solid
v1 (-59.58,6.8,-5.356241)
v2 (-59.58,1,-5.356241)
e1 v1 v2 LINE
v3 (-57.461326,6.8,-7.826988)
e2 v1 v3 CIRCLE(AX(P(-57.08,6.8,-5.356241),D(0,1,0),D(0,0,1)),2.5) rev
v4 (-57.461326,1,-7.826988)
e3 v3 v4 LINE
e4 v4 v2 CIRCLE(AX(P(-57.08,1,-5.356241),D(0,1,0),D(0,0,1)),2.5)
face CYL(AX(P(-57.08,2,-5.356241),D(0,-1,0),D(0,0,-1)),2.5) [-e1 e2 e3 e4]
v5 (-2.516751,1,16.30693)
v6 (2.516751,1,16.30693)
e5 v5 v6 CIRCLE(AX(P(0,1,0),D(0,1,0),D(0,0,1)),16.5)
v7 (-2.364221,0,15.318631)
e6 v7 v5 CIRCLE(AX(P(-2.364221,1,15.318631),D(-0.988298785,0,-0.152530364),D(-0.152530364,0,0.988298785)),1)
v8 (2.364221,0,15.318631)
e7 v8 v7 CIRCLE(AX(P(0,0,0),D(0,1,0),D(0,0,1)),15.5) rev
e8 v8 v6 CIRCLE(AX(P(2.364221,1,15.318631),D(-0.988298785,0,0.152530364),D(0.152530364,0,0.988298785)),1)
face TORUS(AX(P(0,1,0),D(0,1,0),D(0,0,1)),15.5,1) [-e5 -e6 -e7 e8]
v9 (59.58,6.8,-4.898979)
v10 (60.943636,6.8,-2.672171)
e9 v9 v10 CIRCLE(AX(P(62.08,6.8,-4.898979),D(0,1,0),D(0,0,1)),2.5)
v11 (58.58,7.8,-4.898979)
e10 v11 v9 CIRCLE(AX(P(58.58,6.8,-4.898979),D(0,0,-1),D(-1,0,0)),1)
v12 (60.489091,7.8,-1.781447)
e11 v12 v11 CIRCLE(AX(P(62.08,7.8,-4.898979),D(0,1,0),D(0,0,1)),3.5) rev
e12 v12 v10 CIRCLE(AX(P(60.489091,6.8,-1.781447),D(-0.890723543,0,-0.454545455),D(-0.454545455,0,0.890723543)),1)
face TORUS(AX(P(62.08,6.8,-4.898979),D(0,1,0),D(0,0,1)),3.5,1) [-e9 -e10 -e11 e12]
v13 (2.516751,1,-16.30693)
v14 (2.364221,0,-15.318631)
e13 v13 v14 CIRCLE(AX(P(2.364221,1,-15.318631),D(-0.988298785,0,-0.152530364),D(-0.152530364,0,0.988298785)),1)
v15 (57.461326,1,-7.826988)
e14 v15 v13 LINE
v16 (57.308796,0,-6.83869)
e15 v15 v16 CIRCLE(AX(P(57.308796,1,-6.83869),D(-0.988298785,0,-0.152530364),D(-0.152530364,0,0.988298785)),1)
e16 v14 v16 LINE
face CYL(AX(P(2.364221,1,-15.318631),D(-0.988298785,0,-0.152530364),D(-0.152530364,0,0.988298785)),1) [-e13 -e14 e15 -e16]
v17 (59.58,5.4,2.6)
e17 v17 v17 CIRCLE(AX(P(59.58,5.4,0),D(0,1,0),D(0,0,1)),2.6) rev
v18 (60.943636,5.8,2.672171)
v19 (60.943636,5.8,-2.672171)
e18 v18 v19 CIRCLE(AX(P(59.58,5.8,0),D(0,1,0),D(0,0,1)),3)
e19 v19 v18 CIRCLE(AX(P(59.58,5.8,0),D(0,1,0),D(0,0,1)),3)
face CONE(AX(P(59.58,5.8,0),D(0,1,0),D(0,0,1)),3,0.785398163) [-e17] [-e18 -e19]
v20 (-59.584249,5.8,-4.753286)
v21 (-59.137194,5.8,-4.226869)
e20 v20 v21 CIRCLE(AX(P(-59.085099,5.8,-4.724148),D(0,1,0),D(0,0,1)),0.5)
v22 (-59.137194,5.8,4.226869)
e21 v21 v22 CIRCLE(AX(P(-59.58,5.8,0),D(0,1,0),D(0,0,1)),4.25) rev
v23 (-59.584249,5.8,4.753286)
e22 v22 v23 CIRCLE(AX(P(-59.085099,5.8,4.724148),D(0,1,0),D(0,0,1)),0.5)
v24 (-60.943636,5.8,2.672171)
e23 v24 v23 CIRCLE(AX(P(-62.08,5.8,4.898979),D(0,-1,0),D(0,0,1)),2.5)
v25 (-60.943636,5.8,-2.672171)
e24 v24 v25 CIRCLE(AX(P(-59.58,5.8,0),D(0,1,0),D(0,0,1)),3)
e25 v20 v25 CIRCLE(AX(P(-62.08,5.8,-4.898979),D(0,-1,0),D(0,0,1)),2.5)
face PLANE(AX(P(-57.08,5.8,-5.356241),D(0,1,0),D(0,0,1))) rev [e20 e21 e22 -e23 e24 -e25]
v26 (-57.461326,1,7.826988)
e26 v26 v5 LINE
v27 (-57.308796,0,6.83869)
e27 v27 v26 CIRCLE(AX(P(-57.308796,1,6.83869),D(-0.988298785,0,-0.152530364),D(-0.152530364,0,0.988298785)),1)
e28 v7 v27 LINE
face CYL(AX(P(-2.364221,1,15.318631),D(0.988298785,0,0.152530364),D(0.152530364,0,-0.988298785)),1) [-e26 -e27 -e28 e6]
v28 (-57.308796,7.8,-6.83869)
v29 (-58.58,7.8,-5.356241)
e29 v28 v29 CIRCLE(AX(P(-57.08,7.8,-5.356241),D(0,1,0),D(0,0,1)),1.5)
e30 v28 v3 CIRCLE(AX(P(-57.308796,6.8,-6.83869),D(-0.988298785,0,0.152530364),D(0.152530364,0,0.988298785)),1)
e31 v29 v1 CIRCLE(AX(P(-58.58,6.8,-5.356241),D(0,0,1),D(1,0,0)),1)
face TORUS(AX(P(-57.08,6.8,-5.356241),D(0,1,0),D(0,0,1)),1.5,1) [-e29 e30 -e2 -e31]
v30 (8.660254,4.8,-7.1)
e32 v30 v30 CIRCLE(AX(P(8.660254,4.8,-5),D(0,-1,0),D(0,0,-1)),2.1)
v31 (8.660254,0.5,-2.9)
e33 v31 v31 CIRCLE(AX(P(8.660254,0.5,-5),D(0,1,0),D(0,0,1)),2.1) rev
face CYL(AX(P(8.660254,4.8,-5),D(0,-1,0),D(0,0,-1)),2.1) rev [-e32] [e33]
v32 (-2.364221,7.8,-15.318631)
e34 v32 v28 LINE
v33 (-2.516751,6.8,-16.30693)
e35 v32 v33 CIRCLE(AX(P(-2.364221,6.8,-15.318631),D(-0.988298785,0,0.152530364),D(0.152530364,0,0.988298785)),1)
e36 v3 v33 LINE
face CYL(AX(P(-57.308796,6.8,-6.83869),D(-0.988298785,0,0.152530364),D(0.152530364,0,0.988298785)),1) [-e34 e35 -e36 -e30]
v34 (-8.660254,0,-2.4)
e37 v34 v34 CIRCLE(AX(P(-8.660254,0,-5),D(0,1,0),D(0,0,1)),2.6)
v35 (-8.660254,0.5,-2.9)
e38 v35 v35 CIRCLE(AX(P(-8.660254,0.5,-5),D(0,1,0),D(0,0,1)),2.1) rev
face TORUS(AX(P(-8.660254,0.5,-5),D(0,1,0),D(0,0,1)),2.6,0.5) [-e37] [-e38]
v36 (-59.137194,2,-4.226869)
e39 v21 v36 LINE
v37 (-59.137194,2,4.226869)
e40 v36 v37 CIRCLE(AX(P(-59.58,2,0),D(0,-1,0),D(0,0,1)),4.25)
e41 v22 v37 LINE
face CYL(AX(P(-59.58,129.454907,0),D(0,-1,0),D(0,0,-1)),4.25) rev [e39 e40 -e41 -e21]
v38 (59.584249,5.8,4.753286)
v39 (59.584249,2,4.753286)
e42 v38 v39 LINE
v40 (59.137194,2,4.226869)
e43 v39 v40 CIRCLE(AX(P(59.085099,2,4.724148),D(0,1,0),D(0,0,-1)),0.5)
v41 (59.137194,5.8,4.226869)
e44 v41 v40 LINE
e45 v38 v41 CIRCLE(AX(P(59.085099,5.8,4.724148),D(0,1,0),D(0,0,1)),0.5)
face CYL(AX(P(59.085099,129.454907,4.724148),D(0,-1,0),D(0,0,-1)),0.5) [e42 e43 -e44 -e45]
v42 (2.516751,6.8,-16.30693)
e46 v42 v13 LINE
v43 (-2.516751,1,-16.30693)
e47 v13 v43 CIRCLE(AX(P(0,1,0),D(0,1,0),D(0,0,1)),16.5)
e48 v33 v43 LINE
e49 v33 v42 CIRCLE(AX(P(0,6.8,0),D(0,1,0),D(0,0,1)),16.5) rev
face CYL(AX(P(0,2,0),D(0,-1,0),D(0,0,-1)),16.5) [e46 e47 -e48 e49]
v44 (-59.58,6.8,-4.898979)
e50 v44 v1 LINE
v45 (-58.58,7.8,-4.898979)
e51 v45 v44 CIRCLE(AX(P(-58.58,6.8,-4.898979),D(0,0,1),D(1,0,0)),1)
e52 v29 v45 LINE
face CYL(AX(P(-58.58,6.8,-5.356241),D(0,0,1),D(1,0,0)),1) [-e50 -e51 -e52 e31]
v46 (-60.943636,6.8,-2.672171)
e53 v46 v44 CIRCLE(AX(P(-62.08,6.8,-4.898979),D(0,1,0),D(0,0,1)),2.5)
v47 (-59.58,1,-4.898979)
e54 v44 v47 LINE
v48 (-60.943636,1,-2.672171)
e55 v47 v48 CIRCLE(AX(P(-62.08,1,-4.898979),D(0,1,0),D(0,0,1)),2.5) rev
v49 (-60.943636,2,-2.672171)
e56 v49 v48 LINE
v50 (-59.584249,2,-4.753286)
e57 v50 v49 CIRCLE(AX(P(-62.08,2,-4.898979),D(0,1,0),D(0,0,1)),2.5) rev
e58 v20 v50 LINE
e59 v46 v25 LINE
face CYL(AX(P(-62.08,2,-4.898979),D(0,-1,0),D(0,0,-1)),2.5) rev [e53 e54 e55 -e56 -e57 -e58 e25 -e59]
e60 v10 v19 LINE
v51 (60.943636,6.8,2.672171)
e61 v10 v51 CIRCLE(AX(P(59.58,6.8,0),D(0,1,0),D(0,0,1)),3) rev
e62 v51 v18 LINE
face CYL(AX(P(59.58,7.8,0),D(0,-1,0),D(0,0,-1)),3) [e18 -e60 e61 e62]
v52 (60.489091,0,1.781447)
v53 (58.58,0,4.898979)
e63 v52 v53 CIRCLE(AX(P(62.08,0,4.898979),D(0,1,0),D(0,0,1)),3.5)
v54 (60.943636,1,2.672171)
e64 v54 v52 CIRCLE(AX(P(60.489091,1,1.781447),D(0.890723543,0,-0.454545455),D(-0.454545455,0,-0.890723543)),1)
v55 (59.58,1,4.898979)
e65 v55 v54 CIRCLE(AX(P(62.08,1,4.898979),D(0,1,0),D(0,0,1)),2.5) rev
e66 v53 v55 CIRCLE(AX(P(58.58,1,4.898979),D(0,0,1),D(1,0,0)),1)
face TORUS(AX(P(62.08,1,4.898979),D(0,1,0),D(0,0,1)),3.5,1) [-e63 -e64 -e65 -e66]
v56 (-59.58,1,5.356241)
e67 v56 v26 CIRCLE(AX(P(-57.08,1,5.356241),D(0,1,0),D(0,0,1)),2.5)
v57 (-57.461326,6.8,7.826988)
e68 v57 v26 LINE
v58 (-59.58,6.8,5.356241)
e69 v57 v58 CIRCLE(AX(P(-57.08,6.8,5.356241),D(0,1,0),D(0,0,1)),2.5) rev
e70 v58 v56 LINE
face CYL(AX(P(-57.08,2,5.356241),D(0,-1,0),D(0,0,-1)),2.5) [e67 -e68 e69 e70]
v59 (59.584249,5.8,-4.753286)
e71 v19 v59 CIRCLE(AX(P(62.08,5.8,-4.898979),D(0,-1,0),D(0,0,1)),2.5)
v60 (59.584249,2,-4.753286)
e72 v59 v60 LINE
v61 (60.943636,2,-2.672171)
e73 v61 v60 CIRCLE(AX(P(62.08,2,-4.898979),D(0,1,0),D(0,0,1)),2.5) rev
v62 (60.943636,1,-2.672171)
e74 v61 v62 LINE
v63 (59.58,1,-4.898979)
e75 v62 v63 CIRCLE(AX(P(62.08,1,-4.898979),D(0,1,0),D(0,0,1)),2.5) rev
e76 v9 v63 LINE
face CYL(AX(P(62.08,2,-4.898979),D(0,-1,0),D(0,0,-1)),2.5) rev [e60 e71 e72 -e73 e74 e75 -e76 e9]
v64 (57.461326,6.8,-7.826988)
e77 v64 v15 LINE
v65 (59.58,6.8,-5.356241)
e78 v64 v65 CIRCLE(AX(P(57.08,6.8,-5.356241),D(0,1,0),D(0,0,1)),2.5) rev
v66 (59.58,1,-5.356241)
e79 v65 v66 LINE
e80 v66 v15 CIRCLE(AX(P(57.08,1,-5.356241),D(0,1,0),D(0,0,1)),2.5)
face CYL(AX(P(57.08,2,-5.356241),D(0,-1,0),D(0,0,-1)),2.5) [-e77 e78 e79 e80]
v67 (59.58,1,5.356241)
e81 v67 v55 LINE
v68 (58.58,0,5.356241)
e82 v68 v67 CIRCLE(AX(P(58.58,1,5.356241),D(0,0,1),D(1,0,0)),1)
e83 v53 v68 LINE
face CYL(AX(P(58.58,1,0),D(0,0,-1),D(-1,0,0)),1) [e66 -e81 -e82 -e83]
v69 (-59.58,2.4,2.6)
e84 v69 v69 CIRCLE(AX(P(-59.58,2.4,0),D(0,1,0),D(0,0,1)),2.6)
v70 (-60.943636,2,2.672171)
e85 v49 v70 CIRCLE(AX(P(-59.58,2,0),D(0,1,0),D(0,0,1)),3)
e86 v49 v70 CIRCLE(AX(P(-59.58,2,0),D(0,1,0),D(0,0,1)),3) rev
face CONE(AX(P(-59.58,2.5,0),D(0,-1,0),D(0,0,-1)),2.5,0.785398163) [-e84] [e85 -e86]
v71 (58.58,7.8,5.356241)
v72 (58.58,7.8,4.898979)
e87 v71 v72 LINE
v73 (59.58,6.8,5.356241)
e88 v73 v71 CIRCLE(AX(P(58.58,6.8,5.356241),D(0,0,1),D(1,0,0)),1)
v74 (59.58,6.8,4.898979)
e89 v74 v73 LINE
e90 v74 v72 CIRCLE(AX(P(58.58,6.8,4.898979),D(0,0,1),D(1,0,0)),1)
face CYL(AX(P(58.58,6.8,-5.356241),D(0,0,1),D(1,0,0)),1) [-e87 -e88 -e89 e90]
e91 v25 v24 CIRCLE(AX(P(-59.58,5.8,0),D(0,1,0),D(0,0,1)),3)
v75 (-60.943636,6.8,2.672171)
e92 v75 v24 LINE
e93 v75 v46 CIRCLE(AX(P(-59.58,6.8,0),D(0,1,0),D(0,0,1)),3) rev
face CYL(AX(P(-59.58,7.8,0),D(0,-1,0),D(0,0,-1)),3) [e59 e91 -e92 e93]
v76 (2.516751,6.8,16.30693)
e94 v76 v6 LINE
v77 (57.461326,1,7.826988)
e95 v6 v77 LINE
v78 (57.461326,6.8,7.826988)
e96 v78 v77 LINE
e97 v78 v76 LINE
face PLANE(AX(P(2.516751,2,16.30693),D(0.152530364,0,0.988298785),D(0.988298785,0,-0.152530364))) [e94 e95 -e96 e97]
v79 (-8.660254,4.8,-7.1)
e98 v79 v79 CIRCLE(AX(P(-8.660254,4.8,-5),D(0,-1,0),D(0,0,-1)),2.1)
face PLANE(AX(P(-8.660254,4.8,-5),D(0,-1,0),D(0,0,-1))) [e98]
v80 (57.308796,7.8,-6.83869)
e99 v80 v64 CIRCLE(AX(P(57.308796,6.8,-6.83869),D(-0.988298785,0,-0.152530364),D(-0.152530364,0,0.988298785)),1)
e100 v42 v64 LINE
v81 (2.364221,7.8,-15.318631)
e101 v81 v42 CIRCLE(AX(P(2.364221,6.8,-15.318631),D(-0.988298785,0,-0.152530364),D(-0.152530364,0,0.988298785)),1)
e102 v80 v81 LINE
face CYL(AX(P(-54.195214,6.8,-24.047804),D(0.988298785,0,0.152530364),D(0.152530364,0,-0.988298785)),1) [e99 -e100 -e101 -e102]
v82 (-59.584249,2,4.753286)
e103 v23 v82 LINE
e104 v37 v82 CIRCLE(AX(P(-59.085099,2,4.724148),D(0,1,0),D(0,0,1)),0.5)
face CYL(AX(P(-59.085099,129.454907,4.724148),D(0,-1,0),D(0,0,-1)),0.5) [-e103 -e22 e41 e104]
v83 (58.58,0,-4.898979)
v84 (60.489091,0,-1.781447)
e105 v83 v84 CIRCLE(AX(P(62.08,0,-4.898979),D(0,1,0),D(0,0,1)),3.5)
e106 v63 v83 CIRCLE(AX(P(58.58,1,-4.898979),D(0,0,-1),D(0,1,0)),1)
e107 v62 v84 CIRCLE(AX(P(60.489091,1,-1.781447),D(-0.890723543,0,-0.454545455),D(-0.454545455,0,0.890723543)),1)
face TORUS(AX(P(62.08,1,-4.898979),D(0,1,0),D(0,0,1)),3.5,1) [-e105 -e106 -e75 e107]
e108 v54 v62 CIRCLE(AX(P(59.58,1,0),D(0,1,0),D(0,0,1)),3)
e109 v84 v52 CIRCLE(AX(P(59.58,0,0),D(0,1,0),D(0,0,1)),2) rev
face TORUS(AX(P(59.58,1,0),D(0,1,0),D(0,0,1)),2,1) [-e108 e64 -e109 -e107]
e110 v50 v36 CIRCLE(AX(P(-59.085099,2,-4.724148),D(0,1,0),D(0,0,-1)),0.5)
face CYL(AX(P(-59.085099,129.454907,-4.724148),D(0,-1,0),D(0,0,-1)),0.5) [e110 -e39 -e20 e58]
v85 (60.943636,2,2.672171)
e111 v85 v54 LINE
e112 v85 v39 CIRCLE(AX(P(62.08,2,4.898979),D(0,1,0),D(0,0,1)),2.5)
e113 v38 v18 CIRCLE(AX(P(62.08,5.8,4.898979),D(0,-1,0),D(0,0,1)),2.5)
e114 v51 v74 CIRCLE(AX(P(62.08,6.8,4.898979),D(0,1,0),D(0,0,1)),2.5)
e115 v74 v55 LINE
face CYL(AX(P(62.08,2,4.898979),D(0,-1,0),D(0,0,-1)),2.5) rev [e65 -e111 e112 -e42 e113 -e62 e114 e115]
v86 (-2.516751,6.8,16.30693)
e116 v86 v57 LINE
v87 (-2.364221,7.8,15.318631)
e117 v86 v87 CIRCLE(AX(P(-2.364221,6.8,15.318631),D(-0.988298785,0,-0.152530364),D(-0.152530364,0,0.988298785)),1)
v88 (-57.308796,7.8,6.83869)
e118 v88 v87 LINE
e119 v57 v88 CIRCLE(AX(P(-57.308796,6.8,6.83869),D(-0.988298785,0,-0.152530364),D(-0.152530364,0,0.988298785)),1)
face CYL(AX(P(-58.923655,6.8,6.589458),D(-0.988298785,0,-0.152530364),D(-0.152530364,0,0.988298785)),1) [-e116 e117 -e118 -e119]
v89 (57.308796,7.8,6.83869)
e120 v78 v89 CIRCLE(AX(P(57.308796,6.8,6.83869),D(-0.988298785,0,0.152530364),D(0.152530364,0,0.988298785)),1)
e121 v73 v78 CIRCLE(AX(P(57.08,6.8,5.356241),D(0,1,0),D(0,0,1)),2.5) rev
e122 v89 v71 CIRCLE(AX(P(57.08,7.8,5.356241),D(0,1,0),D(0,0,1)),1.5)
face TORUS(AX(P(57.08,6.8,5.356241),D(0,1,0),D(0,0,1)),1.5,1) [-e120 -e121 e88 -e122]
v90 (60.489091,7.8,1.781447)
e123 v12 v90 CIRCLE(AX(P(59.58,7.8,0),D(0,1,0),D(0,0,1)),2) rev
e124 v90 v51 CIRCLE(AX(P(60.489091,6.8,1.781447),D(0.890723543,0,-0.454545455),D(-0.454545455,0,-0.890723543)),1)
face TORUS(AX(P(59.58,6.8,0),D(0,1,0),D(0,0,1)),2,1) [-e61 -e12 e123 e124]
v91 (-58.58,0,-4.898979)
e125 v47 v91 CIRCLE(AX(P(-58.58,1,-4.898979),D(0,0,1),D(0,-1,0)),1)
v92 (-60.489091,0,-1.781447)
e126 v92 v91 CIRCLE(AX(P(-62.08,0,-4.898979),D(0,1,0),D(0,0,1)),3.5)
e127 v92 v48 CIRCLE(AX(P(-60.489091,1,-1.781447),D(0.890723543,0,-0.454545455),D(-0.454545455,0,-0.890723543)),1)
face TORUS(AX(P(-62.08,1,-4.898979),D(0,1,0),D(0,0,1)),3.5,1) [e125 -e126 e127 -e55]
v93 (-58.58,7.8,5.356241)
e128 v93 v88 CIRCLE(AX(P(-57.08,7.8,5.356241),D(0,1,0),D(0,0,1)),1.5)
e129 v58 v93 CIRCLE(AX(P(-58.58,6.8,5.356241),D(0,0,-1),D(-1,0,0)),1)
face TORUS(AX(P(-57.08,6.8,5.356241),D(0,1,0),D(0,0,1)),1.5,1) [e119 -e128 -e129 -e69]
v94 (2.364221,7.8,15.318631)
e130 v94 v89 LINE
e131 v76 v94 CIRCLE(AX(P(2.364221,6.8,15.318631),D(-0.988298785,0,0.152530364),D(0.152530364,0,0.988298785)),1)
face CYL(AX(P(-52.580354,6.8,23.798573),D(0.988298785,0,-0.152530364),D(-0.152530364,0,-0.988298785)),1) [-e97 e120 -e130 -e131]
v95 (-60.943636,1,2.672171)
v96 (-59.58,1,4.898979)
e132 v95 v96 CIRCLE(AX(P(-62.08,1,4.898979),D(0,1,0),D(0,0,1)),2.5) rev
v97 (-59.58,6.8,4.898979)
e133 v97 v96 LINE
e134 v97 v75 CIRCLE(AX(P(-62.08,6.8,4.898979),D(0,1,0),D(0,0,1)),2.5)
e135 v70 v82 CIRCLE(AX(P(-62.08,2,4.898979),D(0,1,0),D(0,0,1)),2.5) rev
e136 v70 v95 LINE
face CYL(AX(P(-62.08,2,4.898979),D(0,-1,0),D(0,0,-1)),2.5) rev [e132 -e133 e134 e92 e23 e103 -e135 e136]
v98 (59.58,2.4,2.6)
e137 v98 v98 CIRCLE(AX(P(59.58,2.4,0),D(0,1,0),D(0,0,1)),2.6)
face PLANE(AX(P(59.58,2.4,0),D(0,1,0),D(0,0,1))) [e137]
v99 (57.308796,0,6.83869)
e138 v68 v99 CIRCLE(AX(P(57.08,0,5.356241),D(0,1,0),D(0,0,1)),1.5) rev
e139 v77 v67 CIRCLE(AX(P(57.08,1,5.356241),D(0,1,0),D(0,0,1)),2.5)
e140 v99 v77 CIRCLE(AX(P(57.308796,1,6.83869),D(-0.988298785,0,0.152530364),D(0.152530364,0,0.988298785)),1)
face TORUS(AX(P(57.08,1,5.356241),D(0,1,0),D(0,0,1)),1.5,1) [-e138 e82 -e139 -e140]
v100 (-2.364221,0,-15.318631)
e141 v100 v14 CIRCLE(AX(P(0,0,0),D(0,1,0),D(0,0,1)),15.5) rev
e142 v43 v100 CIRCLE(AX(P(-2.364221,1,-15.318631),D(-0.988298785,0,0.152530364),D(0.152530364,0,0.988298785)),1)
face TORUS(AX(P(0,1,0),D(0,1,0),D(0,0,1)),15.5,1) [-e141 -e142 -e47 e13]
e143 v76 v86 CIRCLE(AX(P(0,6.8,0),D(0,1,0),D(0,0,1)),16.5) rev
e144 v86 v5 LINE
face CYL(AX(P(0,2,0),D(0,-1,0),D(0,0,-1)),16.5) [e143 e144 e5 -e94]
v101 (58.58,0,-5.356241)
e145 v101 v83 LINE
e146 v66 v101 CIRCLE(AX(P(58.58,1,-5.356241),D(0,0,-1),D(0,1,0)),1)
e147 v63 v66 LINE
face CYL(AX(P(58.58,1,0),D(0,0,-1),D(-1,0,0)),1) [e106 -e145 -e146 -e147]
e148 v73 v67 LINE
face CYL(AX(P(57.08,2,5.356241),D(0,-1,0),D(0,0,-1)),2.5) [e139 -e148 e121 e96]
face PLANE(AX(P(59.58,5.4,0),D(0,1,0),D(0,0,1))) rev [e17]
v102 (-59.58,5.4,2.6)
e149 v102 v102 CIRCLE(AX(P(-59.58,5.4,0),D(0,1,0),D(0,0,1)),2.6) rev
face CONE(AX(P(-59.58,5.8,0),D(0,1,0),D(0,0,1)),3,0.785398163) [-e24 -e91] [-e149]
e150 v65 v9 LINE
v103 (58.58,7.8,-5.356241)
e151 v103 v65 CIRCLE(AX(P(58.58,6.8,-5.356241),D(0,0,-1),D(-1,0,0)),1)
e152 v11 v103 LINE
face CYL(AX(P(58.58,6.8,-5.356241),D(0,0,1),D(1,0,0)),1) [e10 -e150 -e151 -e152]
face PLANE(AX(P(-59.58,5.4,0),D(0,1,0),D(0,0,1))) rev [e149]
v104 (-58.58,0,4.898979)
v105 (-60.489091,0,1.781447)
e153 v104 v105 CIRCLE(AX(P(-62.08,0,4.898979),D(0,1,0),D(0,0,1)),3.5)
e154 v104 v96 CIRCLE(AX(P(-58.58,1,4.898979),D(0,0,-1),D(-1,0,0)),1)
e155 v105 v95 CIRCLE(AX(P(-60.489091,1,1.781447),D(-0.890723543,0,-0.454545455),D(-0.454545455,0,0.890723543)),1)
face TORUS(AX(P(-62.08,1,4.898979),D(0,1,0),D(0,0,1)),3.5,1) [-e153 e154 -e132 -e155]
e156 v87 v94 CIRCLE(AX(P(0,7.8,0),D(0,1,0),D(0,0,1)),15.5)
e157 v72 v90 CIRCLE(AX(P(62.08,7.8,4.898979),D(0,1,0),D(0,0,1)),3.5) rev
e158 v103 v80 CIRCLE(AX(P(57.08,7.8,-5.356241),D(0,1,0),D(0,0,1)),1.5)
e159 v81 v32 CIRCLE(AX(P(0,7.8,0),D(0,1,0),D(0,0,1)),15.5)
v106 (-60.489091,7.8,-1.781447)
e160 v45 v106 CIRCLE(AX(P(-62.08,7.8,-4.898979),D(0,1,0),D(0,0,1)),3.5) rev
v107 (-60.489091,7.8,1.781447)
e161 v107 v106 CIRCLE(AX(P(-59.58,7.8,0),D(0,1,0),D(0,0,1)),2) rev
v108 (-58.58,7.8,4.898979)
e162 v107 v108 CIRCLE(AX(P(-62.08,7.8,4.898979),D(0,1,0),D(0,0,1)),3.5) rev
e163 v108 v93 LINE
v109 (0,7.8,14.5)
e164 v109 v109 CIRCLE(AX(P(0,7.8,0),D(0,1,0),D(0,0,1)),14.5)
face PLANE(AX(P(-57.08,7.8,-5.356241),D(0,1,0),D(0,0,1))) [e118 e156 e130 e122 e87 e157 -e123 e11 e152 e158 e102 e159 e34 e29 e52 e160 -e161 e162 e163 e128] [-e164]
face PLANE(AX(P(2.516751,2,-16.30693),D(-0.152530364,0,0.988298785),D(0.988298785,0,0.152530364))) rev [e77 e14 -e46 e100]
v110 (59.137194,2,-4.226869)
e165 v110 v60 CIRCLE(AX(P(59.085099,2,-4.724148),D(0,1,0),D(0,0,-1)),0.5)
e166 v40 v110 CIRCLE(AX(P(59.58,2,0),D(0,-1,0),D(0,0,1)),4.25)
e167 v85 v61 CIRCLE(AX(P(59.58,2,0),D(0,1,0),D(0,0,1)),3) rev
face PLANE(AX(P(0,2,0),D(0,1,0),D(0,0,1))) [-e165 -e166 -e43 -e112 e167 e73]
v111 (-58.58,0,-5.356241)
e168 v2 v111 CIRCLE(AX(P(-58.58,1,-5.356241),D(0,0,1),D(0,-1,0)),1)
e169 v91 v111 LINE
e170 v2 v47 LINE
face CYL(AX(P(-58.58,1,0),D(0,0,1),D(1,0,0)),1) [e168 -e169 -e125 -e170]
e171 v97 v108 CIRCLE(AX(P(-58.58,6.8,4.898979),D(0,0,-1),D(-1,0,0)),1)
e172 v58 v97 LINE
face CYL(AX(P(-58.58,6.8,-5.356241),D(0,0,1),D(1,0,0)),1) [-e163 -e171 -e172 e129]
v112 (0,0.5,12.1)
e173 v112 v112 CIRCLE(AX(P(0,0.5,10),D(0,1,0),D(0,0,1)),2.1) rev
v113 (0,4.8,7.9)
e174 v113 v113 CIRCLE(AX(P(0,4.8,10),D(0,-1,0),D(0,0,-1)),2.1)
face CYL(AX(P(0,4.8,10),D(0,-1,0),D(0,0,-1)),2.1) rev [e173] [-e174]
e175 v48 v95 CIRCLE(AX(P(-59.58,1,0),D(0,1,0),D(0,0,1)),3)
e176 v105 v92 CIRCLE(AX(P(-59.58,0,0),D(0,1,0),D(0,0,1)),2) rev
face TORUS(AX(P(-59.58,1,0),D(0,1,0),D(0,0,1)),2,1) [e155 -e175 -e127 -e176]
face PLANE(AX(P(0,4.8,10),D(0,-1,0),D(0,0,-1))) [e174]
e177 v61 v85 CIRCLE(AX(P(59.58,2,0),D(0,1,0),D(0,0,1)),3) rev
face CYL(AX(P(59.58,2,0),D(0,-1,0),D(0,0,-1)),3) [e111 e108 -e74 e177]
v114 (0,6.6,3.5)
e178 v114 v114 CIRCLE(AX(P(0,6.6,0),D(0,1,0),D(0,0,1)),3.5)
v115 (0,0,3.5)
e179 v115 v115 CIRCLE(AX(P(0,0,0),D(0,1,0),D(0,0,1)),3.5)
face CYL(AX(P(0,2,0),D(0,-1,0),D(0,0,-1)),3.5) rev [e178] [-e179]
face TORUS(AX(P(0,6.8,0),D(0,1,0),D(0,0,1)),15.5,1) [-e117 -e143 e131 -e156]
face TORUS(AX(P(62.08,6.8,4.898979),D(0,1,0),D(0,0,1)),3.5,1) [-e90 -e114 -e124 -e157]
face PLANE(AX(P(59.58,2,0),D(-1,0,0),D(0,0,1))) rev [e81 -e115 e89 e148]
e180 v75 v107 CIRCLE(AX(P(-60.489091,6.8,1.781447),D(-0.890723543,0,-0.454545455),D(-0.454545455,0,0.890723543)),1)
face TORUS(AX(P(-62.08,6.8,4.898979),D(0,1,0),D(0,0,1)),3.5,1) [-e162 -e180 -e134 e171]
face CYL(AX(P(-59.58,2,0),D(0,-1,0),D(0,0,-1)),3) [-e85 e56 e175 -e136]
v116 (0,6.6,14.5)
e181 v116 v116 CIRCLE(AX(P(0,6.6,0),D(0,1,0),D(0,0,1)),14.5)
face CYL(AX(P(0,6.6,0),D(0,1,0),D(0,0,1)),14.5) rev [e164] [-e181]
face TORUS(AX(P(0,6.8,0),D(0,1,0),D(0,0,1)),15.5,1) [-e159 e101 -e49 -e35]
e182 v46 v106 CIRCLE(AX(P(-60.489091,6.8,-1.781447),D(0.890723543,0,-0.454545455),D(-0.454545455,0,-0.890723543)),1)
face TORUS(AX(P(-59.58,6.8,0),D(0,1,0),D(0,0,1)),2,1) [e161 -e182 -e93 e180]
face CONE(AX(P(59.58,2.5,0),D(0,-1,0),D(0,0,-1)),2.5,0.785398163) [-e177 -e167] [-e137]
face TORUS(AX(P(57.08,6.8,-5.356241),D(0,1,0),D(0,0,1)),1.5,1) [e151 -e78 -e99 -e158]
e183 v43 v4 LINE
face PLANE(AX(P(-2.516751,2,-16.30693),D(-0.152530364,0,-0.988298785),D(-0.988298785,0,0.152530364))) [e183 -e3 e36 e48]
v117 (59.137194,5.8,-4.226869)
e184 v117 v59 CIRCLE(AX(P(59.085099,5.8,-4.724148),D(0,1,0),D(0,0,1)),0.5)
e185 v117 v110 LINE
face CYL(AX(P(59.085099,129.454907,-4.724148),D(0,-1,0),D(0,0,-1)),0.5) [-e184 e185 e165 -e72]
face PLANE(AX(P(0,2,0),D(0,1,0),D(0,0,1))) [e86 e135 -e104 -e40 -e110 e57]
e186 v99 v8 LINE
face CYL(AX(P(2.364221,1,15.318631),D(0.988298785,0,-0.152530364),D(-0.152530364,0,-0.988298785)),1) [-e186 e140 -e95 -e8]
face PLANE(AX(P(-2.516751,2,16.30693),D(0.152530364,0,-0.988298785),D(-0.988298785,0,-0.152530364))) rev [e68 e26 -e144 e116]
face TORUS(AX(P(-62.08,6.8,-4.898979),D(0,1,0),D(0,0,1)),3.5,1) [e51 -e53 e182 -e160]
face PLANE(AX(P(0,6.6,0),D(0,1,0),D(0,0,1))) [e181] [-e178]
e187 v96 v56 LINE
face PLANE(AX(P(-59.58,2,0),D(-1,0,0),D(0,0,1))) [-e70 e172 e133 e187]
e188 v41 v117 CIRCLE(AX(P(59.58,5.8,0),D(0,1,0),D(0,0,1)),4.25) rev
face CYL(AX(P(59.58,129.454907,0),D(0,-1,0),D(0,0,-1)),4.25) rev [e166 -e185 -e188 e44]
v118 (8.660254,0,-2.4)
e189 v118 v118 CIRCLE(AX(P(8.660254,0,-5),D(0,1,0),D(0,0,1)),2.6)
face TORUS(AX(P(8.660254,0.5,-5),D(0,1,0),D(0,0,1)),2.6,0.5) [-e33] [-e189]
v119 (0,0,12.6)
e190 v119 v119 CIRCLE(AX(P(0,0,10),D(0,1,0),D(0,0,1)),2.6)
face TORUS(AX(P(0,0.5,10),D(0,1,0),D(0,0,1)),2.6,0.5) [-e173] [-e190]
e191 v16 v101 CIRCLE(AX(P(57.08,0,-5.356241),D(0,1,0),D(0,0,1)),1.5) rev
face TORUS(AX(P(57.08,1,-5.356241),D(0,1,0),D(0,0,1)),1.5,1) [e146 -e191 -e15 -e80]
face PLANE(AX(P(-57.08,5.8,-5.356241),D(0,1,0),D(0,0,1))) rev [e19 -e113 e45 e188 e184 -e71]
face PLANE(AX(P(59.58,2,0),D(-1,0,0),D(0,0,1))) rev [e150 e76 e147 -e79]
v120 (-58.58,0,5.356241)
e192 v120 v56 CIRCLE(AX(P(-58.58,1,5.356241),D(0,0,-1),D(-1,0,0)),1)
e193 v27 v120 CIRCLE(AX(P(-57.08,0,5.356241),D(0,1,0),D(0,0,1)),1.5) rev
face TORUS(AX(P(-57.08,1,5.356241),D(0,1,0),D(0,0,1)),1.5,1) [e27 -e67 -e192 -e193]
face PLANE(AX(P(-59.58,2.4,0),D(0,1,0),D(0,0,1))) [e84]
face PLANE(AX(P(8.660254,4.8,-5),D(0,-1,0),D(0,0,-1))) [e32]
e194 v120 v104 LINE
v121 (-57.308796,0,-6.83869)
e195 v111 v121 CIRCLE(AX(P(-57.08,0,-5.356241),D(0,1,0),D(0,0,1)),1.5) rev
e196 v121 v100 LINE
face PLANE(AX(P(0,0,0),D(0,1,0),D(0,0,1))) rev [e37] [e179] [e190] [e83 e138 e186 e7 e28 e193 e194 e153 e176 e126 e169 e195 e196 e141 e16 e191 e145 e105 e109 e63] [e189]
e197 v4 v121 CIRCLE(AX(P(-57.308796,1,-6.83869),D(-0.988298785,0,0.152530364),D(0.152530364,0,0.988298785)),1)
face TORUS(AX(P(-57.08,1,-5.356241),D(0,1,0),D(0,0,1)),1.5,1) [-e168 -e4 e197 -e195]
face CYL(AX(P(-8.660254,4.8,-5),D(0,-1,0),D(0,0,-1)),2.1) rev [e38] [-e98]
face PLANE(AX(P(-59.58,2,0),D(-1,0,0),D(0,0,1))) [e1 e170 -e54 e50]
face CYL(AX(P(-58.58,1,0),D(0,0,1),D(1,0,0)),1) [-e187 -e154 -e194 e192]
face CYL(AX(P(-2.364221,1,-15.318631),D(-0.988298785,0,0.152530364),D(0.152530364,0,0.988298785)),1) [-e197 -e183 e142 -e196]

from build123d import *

# Parameters (mm, degrees)
SKETCH1_R             = 3.5
BOSS_EXTRUDE1_DEPTH   = 2
SKETCH2_R             = 2.5
BOSS_EXTRUDE2_DEPTH   = 0.4
SKETCH3_R             = 2
BOSS_EXTRUDE3_DEPTH   = 3
SKETCH5_R             = 2.5
BOSS_EXTRUDE4_DEPTH   = 0.4
SKETCH4_R             = 3.5
BOSS_EXTRUDE5_DEPTH   = 3.8
SKETCH6_R             = 3.5
BOSS_EXTRUDE6_DEPTH   = 2
SKETCH9_R             = 14.5
CUT_EXTRUDE3_DEPTH    = 1.2
CUT_EXTRUDE5_START    = -1
SKETCH12_R            = 2
CUT_EXTRUDE5_DEPTH    = 65.187010976
CHAMFER1_SIZE         = 0.5
SKETCH13_R            = 2.1
CUT_EXTRUDE6_DEPTH    = 4.8
FILLET4_R             = 0.5
FILLET5_R             = 1
DELETEFACE1_START     = 1
DELETEFACE1_OUTLINE_R = 2
DELETEFACE1_DEPTH     = 1.4
DELETEFACE2_START     = 5.4
DELETEFACE2_OUTLINE_R = 2
DELETEFACE2_DEPTH     = 2.4


with BuildPart() as part:
    # Sketch1 → Boss-Extrude1 (new body)
    with BuildSketch(Plane(origin=(0, 0, 0), x_dir=(1, 0, 0), z_dir=(0, 1, 0))):
        with BuildLine():
            ThreePointArc((-59.58, 5.356241329), (-58.977803306, 6.983614247), (-57.461325911, 7.826988291))
            Line((-57.461325911, 7.826988291), (-2.516751014, 16.306929948))
            ThreePointArc((-2.516751014, 16.306929948), (0, 16.5), (2.516751014, 16.306929948))
            Line((2.516751014, 16.306929948), (57.461325911, 7.826988291))
            ThreePointArc((57.461325911, 7.826988291), (58.977803306, 6.983614247), (59.58, 5.356241329))
            Line((59.58, 5.356241329), (59.58, 4.898979486))
            ThreePointArc((59.58, 4.898979486), (59.947992836, 3.593397066), (60.943636364, 2.672170628))
            ThreePointArc((60.943636364, 2.672170628), (62.58, 0), (60.943636364, -2.672170628))
            ThreePointArc((60.943636364, -2.672170628), (59.947992836, -3.593397066), (59.58, -4.898979486))
            Line((59.58, -4.898979486), (59.58, -5.356241329))
            ThreePointArc((59.58, -5.356241329), (58.977803306, -6.983614247), (57.461325911, -7.826988291))
            Line((57.461325911, -7.826988291), (2.516751014, -16.306929948))
            ThreePointArc((2.516751014, -16.306929948), (0, -16.5), (-2.516751014, -16.306929948))
            Line((-2.516751014, -16.306929948), (-57.461325911, -7.826988291))
            ThreePointArc((-57.461325911, -7.826988291), (-58.977803306, -6.983614247), (-59.58, -5.356241329))
            Line((-59.58, -5.356241329), (-59.58, -4.898979486))
            ThreePointArc((-59.58, -4.898979486), (-59.947992836, -3.593397066), (-60.943636364, -2.672170628))
            ThreePointArc((-60.943636364, -2.672170628), (-62.58, 0), (-60.943636364, 2.672170628))
            ThreePointArc((-60.943636364, 2.672170628), (-59.947992836, 3.593397066), (-59.58, 4.898979486))
            Line((-59.58, 4.898979486), (-59.58, 5.356241329))
        make_face()
        with Locations(Location((0, 0, 0), (0, 0, 270))):
            Circle(SKETCH1_R, mode=Mode.SUBTRACT)
    extrude(amount=BOSS_EXTRUDE1_DEPTH)

    # Sketch2 → Boss-Extrude2 (add)
    with BuildSketch(Plane(origin=(0, 2, 0), x_dir=(1, 0, 0), z_dir=(0, 1, 0))):
        with Locations(Location((-59.58, 0, 0), (0, 0, 270))):
            Circle(SKETCH2_R)
        with Locations(Location((59.58, 0, 0), (0, 0, 270))):
            Circle(SKETCH2_R)
    extrude(amount=BOSS_EXTRUDE2_DEPTH)

    # Sketch3 → Boss-Extrude3 (add)
    with BuildSketch(Plane(origin=(0, 2.4, 0), x_dir=(1, 0, 0), z_dir=(0, 1, 0))):
        with Locations(Location((-59.58, 0, 0), (0, 0, 270))):
            Circle(SKETCH3_R)
        with Locations(Location((59.58, 0, 0), (0, 0, 270))):
            Circle(SKETCH3_R)
    extrude(amount=BOSS_EXTRUDE3_DEPTH)

    # Sketch5 → Boss-Extrude4 (add)
    with BuildSketch(Plane(origin=(0, 5.4, 0), x_dir=(1, 0, 0), z_dir=(0, 1, 0))):
        with Locations(Location((-59.58, 0, 0), (0, 0, 270))):
            Circle(SKETCH5_R)
        with Locations(Location((59.58, 0, 0), (0, 0, 270))):
            Circle(SKETCH5_R)
    extrude(amount=BOSS_EXTRUDE4_DEPTH)

    # Sketch4 → Boss-Extrude5 (add)
    with BuildSketch(Plane(origin=(0, 2, 0), x_dir=(1, 0, 0), z_dir=(0, 1, 0))):
        with BuildLine():
            Line((-59.58, 5.356241329), (-59.58, 4.898979486))
            ThreePointArc((-59.58, 4.898979486), (-59.581062452, 4.826101989), (-59.584248904, 4.753286436))
            ThreePointArc((-59.584248904, 4.753286436), (-59.46621099, 4.400491511), (-59.13719356, 4.226869108))
            ThreePointArc((-59.13719356, 4.226869108), (-55.33, 0), (-59.13719356, -4.226869108))
            ThreePointArc((-59.13719356, -4.226869108), (-59.46621099, -4.400491511), (-59.584248904, -4.753286436))
            ThreePointArc((-59.584248904, -4.753286436), (-59.581062452, -4.826101989), (-59.58, -4.898979486))
            Line((-59.58, -4.898979486), (-59.58, -5.356241329))
            ThreePointArc((-59.58, -5.356241329), (-58.977803306, -6.983614247), (-57.461325911, -7.826988291))
            Line((-57.461325911, -7.826988291), (-2.516751014, -16.306929948))
            ThreePointArc((-2.516751014, -16.306929948), (0, -16.5), (2.516751014, -16.306929948))
            Line((2.516751014, -16.306929948), (57.461325911, -7.826988291))
            ThreePointArc((57.461325911, -7.826988291), (58.977803306, -6.983614247), (59.58, -5.356241329))
            Line((59.58, -5.356241329), (59.58, -4.898979486))
            ThreePointArc((59.58, -4.898979486), (59.581062452, -4.826101989), (59.584248904, -4.753286436))
            ThreePointArc((59.584248904, -4.753286436), (59.46621099, -4.400491511), (59.13719356, -4.226869108))
            ThreePointArc((59.13719356, -4.226869108), (55.33, 0), (59.13719356, 4.226869108))
            ThreePointArc((59.13719356, 4.226869108), (59.46621099, 4.400491511), (59.584248904, 4.753286436))
            ThreePointArc((59.584248904, 4.753286436), (59.581062452, 4.826101989), (59.58, 4.898979486))
            Line((59.58, 4.898979486), (59.58, 5.356241329))
            ThreePointArc((59.58, 5.356241329), (58.977803306, 6.983614247), (57.461325911, 7.826988291))
            Line((57.461325911, 7.826988291), (2.516751014, 16.306929948))
            ThreePointArc((2.516751014, 16.306929948), (0, 16.5), (-2.516751014, 16.306929948))
            Line((-2.516751014, 16.306929948), (-57.461325911, 7.826988291))
            ThreePointArc((-57.461325911, 7.826988291), (-58.977803306, 6.983614247), (-59.58, 5.356241329))
        make_face()
        with Locations(Location((0, 0, 0), (0, 0, 270))):
            Circle(SKETCH4_R, mode=Mode.SUBTRACT)
    extrude(amount=BOSS_EXTRUDE5_DEPTH)

    # Sketch6 → Boss-Extrude6 (add)
    with BuildSketch(Plane(origin=(0, 5.8, 0), x_dir=(1, 0, 0), z_dir=(0, 1, 0))):
        with BuildLine():
            Line((-2.516751014, 16.306929948), (-57.461325911, 7.826988291))
            ThreePointArc((-57.461325911, 7.826988291), (-58.977803306, 6.983614247), (-59.58, 5.356241329))
            Line((-59.58, 5.356241329), (-59.58, 4.898979486))
            ThreePointArc((-59.58, 4.898979486), (-59.947992836, 3.593397066), (-60.943636364, 2.672170628))
            ThreePointArc((-60.943636364, 2.672170628), (-62.58, 0), (-60.943636364, -2.672170628))
            ThreePointArc((-60.943636364, -2.672170628), (-59.947992836, -3.593397066), (-59.58, -4.898979486))
            Line((-59.58, -4.898979486), (-59.58, -5.356241329))
            ThreePointArc((-59.58, -5.356241329), (-58.977803306, -6.983614247), (-57.461325911, -7.826988291))
            Line((-57.461325911, -7.826988291), (-2.516751014, -16.306929948))
            ThreePointArc((-2.516751014, -16.306929948), (0, -16.5), (2.516751014, -16.306929948))
            Line((2.516751014, -16.306929948), (57.461325911, -7.826988291))
            ThreePointArc((57.461325911, -7.826988291), (58.977803306, -6.983614247), (59.58, -5.356241329))
            Line((59.58, -5.356241329), (59.58, -4.898979486))
            ThreePointArc((59.58, -4.898979486), (59.947992836, -3.593397066), (60.943636364, -2.672170628))
            ThreePointArc((60.943636364, -2.672170628), (62.58, 0), (60.943636364, 2.672170628))
            ThreePointArc((60.943636364, 2.672170628), (59.947992836, 3.593397066), (59.58, 4.898979486))
            Line((59.58, 4.898979486), (59.58, 5.356241329))
            ThreePointArc((59.58, 5.356241329), (58.977803306, 6.983614247), (57.461325911, 7.826988291))
            Line((57.461325911, 7.826988291), (2.516751014, 16.306929948))
            ThreePointArc((2.516751014, 16.306929948), (0, 16.5), (-2.516751014, 16.306929948))
        make_face()
        with Locations(Location((0, 0, 0), (0, 0, 270))):
            Circle(SKETCH6_R, mode=Mode.SUBTRACT)
    extrude(amount=BOSS_EXTRUDE6_DEPTH)

    # Sketch9 → Cut-Extrude3 (cut)
    with BuildSketch(Plane(origin=(0, 7.8, 0), x_dir=(1, 0, 0), z_dir=(0, 1, 0))):
        with Locations(Location((0, 0, 0), (0, 0, 270))):
            Circle(SKETCH9_R)
    extrude(amount=-CUT_EXTRUDE3_DEPTH, mode=Mode.SUBTRACT)

    # Sketch12 → Cut-Extrude5 (cut, through all)
    with BuildSketch(Plane.XZ.offset(CUT_EXTRUDE5_START)):
        with Locations(Location((-59.58, 0, 0), (0, 0, 270))):
            Circle(SKETCH12_R)
        with Locations(Location((59.58, 0, 0), (0, 0, 270))):
            Circle(SKETCH12_R)
    extrude(amount=-CUT_EXTRUDE5_DEPTH, mode=Mode.SUBTRACT)

    # Chamfer1
    # the kernel refuses this chamfer: 0.5 mm, written as the material it adds along each edge
    with BuildSketch(Plane(origin=(-59.58, 5.8, 0), x_dir=(0, 0, 1), z_dir=(-1, 0, 0))) as chamfer1_piece_1_section:
        Polygon((2.5, -CHAMFER1_SIZE), (2.5 + CHAMFER1_SIZE, 0), (2.5, 0), align=None)
    chamfer1_piece_1 = revolve(axis=Axis((-59.58, 5.8, 0), (0, 1, 0)), mode=Mode.PRIVATE)
    chamfer1_piece_1 = split(chamfer1_piece_1, bisect_by=Plane(origin=(-59.58, 5.4, 0), z_dir=(0, 1, 0)), keep=Keep.TOP, mode=Mode.PRIVATE)
    add(chamfer1_piece_1)
    with BuildSketch(Plane(origin=(-59.58, 2, 0), x_dir=(0, 0, 1), z_dir=(-1, 0, 0))) as chamfer1_piece_2_section:
        Polygon((2.5 + CHAMFER1_SIZE, 0), (2.5, CHAMFER1_SIZE), (2.5, 0), align=None)
    chamfer1_piece_2 = revolve(axis=Axis((-59.58, 2, 0), (0, 1, 0)), mode=Mode.PRIVATE)
    chamfer1_piece_2 = split(chamfer1_piece_2, bisect_by=Plane(origin=(-59.58, 2.4, 0), z_dir=(0, -1, 0)), keep=Keep.TOP, mode=Mode.PRIVATE)
    add(chamfer1_piece_2)
    with BuildSketch(Plane(origin=(59.58, 5.8, 0), x_dir=(0, 0, 1), z_dir=(-1, 0, 0))) as chamfer1_piece_3_section:
        Polygon((2.5 + CHAMFER1_SIZE, 0), (2.5, -CHAMFER1_SIZE), (2.5, 0), align=None)
    chamfer1_piece_3 = revolve(axis=Axis((59.58, 5.8, 0), (0, 1, 0)), mode=Mode.PRIVATE)
    chamfer1_piece_3 = split(chamfer1_piece_3, bisect_by=Plane(origin=(59.58, 5.4, 0), z_dir=(0, 1, 0)), keep=Keep.TOP, mode=Mode.PRIVATE)
    add(chamfer1_piece_3)
    with BuildSketch(Plane(origin=(59.58, 2, 0), x_dir=(0, 0, 1), z_dir=(-1, 0, 0))) as chamfer1_piece_4_section:
        Polygon((2.5 + CHAMFER1_SIZE, 0), (2.5, CHAMFER1_SIZE), (2.5, 0), align=None)
    chamfer1_piece_4 = revolve(axis=Axis((59.58, 2, 0), (0, 1, 0)), mode=Mode.PRIVATE)
    chamfer1_piece_4 = split(chamfer1_piece_4, bisect_by=Plane(origin=(59.58, 2.4, 0), z_dir=(0, -1, 0)), keep=Keep.TOP, mode=Mode.PRIVATE)
    add(chamfer1_piece_4)

    # Sketch13 → Cut-Extrude6 (cut)
    with BuildSketch(Plane.XZ):
        with Locations(Location((0, 10, 0), (0, 0, 270))):
            Circle(SKETCH13_R)
        with Locations(Location((8.660254038, -5, 0), (0, 0, 270))):
            Circle(SKETCH13_R)
        with Locations(Location((-8.660254038, -5, 0), (0, 0, 270))):
            Circle(SKETCH13_R)
    extrude(amount=-CUT_EXTRUDE6_DEPTH, mode=Mode.SUBTRACT)

    # Fillet4
    fillet4_edges = [part.edges().sort_by_distance(p)[0] for p in [
        (0, 0, 12.1),
        (8.660254038, 0, -2.9),
        (-8.660254038, 0, -2.9),
    ]]
    fillet(fillet4_edges, radius=FILLET4_R)

    # Fillet5
    fillet5_edges = [part.edges().sort_by_distance(p)[0] for p in [
        (-58.977803306, 7.8, -6.983614247),
        (-59.58, 7.8, -5.127610408),
        (-59.947992836, 7.8, -3.593397066),
        (-62.58, 7.8, 0),
        (-59.947992836, 7.8, 3.593397066),
        (-59.58, 7.8, 5.127610408),
        (-58.977803306, 7.8, 6.983614247),
        (-29.989038462, 7.8, 12.06695912),
        (0, 7.8, 16.5),
        (29.989038462, 7.8, 12.06695912),
        (58.977803306, 7.8, 6.983614247),
        (59.58, 7.8, 5.127610408),
        (59.947992836, 7.8, 3.593397066),
        (62.58, 7.8, 0),
        (59.947992836, 7.8, -3.593397066),
        (59.58, 7.8, -5.127610408),
        (58.977803306, 7.8, -6.983614247),
        (29.989038462, 7.8, -12.06695912),
        (0, 7.8, -16.5),
        (-29.989038462, 7.8, -12.06695912),
        (-29.989038462, 0, -12.06695912),
        (0, 0, -16.5),
        (29.989038462, 0, -12.06695912),
        (58.977803306, 0, -6.983614247),
        (59.58, 0, -5.127610408),
        (59.947992836, 0, -3.593397066),
        (62.58, 0, 0),
        (59.947992836, 0, 3.593397066),
        (59.58, 0, 5.127610408),
        (58.977803306, 0, 6.983614247),
        (29.989038462, 0, 12.06695912),
        (0, 0, 16.5),
        (-29.989038462, 0, 12.06695912),
        (-58.977803306, 0, 6.983614247),
        (-59.58, 0, 5.127610408),
        (-59.947992836, 0, 3.593397066),
        (-62.58, 0, 0),
        (-59.947992836, 0, -3.593397066),
        (-59.58, 0, -5.127610408),
        (-58.977803306, 0, -6.983614247),
    ]]
    fillet(fillet5_edges, radius=FILLET5_R - 0.0001)  # a hair under: the kernel refuses the full size

    # DeleteFace1: read off the stored shape, not the designer's step
    # DeleteFace1 outline → DeleteFace1 (add)
    with BuildSketch(Plane(origin=(0, 0, 0), x_dir=(1, 0, 0), z_dir=(0, 1, 0)).offset(DELETEFACE1_START)):
        with Locations((59.58, 0)):
            Circle(DELETEFACE1_OUTLINE_R)
        with Locations((-59.58, 0)):
            Circle(DELETEFACE1_OUTLINE_R)
    extrude(amount=DELETEFACE1_DEPTH)

    # DeleteFace2: read off the stored shape, not the designer's step
    # DeleteFace2 outline → DeleteFace2 (add)
    with BuildSketch(Plane(origin=(0, 0, 0), x_dir=(1, 0, 0), z_dir=(0, 1, 0)).offset(DELETEFACE2_START)):
        with Locations((59.58, 0)):
            Circle(DELETEFACE2_OUTLINE_R)
        with Locations((-59.58, 0)):
            Circle(DELETEFACE2_OUTLINE_R)
    extrude(amount=DELETEFACE2_DEPTH)


solid = part.part
